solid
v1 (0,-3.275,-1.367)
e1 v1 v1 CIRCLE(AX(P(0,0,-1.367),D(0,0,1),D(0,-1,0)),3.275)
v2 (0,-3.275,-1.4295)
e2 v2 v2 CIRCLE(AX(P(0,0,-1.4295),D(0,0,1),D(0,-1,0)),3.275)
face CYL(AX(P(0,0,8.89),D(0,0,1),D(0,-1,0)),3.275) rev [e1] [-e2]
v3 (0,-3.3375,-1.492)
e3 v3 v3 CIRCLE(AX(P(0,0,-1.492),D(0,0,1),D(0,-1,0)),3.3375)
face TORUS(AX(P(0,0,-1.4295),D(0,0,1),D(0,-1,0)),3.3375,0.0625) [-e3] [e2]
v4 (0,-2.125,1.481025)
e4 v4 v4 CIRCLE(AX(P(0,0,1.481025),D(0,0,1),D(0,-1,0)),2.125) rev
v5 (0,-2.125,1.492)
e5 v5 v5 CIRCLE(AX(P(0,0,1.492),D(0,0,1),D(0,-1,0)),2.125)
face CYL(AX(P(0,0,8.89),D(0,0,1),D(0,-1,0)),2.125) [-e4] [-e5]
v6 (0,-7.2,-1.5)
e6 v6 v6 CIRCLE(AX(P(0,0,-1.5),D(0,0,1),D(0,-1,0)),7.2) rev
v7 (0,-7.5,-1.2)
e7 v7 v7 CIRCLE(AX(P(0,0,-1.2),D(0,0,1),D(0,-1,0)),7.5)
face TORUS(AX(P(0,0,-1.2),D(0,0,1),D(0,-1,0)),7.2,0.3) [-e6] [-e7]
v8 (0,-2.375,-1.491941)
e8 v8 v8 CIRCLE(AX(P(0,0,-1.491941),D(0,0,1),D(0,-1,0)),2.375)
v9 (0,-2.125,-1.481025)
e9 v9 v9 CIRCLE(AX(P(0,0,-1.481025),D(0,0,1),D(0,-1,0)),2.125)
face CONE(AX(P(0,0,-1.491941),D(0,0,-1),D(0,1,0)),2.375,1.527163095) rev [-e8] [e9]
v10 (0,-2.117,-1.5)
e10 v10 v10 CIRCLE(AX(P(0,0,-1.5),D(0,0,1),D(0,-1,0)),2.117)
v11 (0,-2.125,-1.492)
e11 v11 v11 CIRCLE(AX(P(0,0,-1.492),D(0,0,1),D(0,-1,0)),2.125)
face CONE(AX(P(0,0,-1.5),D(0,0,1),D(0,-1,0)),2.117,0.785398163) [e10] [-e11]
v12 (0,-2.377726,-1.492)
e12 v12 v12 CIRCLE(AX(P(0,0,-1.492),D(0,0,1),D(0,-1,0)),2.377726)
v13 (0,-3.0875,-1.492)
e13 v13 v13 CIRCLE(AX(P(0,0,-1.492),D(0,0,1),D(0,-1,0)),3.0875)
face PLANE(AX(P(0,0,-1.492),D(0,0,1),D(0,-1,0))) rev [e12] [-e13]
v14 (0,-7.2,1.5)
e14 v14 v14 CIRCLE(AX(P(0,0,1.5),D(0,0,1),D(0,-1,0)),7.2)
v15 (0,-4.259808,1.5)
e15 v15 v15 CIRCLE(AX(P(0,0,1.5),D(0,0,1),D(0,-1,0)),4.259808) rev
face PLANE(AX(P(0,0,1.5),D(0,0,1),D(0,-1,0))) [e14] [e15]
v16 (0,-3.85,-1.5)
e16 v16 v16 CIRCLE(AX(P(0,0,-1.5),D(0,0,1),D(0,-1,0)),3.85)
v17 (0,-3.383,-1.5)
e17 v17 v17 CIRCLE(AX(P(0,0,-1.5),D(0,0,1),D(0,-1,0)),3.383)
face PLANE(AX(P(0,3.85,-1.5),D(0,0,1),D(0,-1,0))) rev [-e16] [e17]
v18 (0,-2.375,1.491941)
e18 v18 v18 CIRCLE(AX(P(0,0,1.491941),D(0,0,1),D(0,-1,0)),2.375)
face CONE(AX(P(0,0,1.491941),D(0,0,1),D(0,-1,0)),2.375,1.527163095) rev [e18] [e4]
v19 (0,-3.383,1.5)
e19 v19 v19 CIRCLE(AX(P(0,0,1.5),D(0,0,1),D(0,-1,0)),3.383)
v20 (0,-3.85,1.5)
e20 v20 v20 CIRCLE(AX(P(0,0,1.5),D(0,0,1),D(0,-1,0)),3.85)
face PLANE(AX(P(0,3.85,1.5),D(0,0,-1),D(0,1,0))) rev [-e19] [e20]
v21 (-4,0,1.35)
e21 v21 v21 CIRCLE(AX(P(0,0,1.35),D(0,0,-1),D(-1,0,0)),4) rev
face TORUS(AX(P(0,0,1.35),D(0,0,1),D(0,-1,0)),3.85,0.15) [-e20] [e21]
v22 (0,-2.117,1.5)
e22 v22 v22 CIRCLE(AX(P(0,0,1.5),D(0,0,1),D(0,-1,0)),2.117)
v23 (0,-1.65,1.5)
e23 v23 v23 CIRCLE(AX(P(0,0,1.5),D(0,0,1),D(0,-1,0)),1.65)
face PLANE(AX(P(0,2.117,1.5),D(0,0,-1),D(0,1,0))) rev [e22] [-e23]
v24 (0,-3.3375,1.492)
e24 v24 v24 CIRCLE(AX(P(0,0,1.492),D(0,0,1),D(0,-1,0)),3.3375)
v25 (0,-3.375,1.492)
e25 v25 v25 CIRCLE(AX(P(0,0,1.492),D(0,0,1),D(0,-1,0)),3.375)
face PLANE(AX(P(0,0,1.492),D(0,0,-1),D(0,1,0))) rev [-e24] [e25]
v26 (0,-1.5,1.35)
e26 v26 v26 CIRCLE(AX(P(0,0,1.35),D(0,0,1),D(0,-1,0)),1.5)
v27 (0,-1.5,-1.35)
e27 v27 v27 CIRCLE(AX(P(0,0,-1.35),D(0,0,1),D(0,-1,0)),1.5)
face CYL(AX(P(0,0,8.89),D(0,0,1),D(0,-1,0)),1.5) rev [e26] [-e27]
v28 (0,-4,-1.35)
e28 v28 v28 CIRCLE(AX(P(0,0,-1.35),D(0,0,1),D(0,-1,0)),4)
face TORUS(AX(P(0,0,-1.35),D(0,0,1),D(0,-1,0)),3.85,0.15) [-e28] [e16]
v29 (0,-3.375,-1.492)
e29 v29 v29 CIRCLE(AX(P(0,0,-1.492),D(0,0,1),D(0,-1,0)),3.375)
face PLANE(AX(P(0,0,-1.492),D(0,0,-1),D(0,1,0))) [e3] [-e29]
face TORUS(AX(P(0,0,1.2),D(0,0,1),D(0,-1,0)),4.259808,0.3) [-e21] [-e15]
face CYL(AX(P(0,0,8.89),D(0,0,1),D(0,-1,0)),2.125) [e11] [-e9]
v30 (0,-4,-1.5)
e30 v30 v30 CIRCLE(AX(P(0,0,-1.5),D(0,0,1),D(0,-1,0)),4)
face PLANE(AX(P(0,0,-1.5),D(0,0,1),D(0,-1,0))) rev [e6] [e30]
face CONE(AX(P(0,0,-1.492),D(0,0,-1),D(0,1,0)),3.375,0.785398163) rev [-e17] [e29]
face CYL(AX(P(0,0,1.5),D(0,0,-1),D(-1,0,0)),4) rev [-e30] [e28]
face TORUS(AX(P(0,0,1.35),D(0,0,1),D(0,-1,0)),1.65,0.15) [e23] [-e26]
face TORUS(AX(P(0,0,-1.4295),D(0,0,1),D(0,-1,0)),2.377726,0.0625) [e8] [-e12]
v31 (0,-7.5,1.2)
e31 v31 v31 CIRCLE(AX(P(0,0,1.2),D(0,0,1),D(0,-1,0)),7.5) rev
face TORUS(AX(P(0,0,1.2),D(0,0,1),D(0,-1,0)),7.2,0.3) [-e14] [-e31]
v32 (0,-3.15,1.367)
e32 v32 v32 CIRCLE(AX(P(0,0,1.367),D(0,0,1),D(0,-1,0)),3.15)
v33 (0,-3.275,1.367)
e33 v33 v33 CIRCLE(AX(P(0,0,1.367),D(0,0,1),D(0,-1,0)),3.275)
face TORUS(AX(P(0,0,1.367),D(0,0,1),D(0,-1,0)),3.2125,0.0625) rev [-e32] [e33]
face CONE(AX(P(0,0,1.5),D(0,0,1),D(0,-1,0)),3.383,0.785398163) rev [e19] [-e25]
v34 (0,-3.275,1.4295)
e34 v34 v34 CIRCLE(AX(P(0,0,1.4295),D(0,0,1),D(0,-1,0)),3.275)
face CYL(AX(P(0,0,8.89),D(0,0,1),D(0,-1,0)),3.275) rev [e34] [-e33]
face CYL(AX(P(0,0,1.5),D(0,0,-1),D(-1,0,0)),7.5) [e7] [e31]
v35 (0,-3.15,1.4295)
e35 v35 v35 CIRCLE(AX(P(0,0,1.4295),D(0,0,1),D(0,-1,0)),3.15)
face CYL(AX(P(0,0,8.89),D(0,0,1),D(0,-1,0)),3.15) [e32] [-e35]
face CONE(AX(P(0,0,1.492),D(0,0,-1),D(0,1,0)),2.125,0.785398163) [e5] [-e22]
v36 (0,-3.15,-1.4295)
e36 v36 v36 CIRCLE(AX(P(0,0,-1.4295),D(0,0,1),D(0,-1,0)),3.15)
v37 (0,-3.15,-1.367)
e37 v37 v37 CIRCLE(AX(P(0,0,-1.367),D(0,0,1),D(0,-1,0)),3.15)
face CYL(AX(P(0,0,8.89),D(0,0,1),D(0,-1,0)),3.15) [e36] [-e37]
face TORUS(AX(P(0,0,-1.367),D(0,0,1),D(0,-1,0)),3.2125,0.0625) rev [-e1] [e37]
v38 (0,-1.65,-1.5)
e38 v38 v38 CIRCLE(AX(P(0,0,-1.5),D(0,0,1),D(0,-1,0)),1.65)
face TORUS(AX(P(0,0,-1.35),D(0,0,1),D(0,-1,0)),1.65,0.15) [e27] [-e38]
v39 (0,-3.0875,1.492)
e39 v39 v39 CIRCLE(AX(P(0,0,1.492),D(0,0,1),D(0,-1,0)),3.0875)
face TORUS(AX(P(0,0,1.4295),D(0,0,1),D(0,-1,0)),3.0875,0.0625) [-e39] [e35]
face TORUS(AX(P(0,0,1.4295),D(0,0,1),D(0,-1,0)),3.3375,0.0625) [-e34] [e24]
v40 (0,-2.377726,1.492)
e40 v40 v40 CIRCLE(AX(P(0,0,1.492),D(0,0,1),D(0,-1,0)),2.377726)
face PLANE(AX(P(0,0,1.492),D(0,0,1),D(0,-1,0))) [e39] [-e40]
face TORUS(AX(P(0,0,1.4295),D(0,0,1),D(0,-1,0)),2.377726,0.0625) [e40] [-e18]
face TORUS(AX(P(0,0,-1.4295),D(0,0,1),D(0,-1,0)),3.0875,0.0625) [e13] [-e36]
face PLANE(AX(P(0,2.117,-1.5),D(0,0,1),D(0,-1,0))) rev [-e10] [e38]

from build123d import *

# Parameters (mm, degrees)
EXTRUDE_START   = -1.5
SKETCH_1_R      = 7.5
SKETCH_1_R_2    = 4
EXTRUDE_2_DEPTH = 3
FILLET_1_R      = 0.3


with BuildPart() as part:
    # Sketch R, INNER BODY → Revolve INNER BODY (revolve)
    with BuildSketch(Plane(origin=(0, 0, 0), x_dir=(0, 0, -1), z_dir=(1, 0, 0)), mode=Mode.PRIVATE) as revolve_inner_body_sk:
        with BuildLine():
            Line((-1.492, 2.125), (-1.5, 2.117))
            Line((-1.5, 2.117), (-1.5, 1.65))
            ThreePointArc((-1.5, 1.65), (-1.456066017, 1.543933983), (-1.35, 1.5))
            Line((-1.35, 1.5), (1.35, 1.5))
            ThreePointArc((1.35, 1.5), (1.456066017, 1.543933983), (1.5, 1.65))
            Line((1.5, 1.65), (1.5, 2.117))
            Line((1.5, 2.117), (1.492, 2.125))
            Line((1.492, 2.125), (-1.492, 2.125))
        make_face()
    revolve(revolve_inner_body_sk.sketch.rotate(Axis((0, 0, 8.89), (0, 0, -1)), 180), axis=Axis((0, 0, 8.89), (0, 0, -1)))



with BuildPart() as body_2:
    # Sketch R, OUTER BODY → Revolve OUTER BODY (revolve)
    with BuildSketch(Plane(origin=(0, 0, 0), x_dir=(0, 0, -1), z_dir=(1, 0, 0)), mode=Mode.PRIVATE) as revolve_outer_body_sk:
        with BuildLine():
            Line((-1.5, 3.85), (-1.5, 3.383))
            Line((-1.5, 3.383), (-1.492, 3.375))
            Line((-1.492, 3.375), (1.492, 3.375))
            Line((1.492, 3.375), (1.5, 3.383))
            Line((1.5, 3.383), (1.5, 3.85))
            ThreePointArc((1.5, 3.85), (1.456066017, 3.956066017), (1.35, 4))
            Line((1.35, 4), (-1.35, 4))
            ThreePointArc((-1.35, 4), (-1.456066017, 3.956066017), (-1.5, 3.85))
        make_face()
    revolve(revolve_outer_body_sk.sketch.rotate(Axis((0, 0, 8.89), (0, 0, -1)), 180), axis=Axis((0, 0, 8.89), (0, 0, -1)))


with BuildPart() as body_3:
    # Sketch R, SHIELD FACES → Revolve SHIELDS (revolve)
    with BuildSketch(Plane(origin=(0, 0, 0), x_dir=(0, 0, -1), z_dir=(1, 0, 0)), mode=Mode.PRIVATE) as revolve_shields_sk:
        with BuildLine():
            Line((-1.492, 3.375), (-1.492, 3.3375))
            ThreePointArc((-1.492, 3.3375), (-1.473694174, 3.293305826), (-1.4295, 3.275))
            Line((-1.4295, 3.275), (-1.367, 3.275))
            ThreePointArc((-1.367, 3.275), (-1.3045, 3.2125), (-1.367, 3.15))
            Line((-1.367, 3.15), (-1.4295, 3.15))
            ThreePointArc((-1.4295, 3.15), (-1.473694174, 3.131694174), (-1.492, 3.0875))
            Line((-1.492, 3.0875), (-1.492, 2.377726212))
            ThreePointArc((-1.492, 2.377726212), (-1.491985127, 2.376362781), (-1.491940514, 2.375))
            Line((-1.491940514, 2.375), (-1.481025278, 2.125))
            Line((-1.481025278, 2.125), (1.481025278, 2.125))
            Line((1.481025278, 2.125), (1.491940514, 2.375))
            ThreePointArc((1.491940514, 2.375), (1.491985127, 2.376362781), (1.492, 2.377726212))
            Line((1.492, 2.377726212), (1.492, 3.0875))
            ThreePointArc((1.492, 3.0875), (1.473694174, 3.131694174), (1.4295, 3.15))
            Line((1.4295, 3.15), (1.367, 3.15))
            ThreePointArc((1.367, 3.15), (1.3045, 3.2125), (1.367, 3.275))
            Line((1.367, 3.275), (1.4295, 3.275))
            ThreePointArc((1.4295, 3.275), (1.473694174, 3.293305826), (1.492, 3.3375))
            Line((1.492, 3.3375), (1.492, 3.375))
            Line((1.492, 3.375), (-1.492, 3.375))
        make_face()
    revolve(revolve_shields_sk.sketch.rotate(Axis((0, 0, 8.89), (0, 0, -1)), 180), axis=Axis((0, 0, 8.89), (0, 0, -1)))


with BuildPart() as part_1:
    add(part.part)

    add(body_3.part)  # 凸台-拉伸2 merges body 3

    add(body_2.part)  # 凸台-拉伸2 merges body 2
    # 草图1 → 凸台-拉伸2 (add)
    with BuildSketch(Plane.XY.offset(EXTRUDE_START)):
        with Locations(Location((0, 0, 0), (0, 0, 270))):
            Circle(SKETCH_1_R)
        with Locations(Location((0, 0, 0), (0, 0, 270))):
            Circle(SKETCH_1_R_2, mode=Mode.SUBTRACT)
    extrude(amount=EXTRUDE_2_DEPTH)

    # 圆角1
    # the kernel refuses this fillet: 0.3 mm, written as the material it takes off along each edge
    with BuildSketch(Plane(origin=(0, 0, 1.5), x_dir=(0, -1, 0), z_dir=(-1, 0, 0))) as fillet_1_piece_1:
        with BuildLine():
            CenterArc((4.259807621, -0.3), FILLET_1_R, 90, 60)
            Line((4.259807621, 0), (4, 0))
            Line((4, 0), (4, -0.15))
        make_face()
    revolve(axis=Axis((0, 0, 1.5), (0, 0, 1)), mode=Mode.SUBTRACT)
    with BuildSketch(Plane(origin=(0, 0, 1.5), x_dir=(0, -1, 0), z_dir=(-1, 0, 0))) as fillet_1_piece_2:
        with BuildLine():
            CenterArc((7.5 - FILLET_1_R, -FILLET_1_R), FILLET_1_R, 0, 90)
            Line((7.5, -FILLET_1_R), (7.5, 0))
            Line((7.5, 0), (7.5 - FILLET_1_R, 0))
        make_face()
    revolve(axis=Axis((0, 0, 1.5), (0, 0, 1)), mode=Mode.SUBTRACT)
    with BuildSketch(Plane(origin=(0, 0, -1.5), x_dir=(0, -1, 0), z_dir=(-1, 0, 0))) as fillet_1_piece_3:
        with BuildLine():
            CenterArc((7.5 - FILLET_1_R, FILLET_1_R), FILLET_1_R, 270, 90)
            Line((7.5 - FILLET_1_R, 0), (7.5, 0))
            Line((7.5, 0), (7.5, FILLET_1_R))
        make_face()
    revolve(axis=Axis((0, 0, -1.5), (0, 0, 1)), mode=Mode.SUBTRACT)


solid = part_1.part
